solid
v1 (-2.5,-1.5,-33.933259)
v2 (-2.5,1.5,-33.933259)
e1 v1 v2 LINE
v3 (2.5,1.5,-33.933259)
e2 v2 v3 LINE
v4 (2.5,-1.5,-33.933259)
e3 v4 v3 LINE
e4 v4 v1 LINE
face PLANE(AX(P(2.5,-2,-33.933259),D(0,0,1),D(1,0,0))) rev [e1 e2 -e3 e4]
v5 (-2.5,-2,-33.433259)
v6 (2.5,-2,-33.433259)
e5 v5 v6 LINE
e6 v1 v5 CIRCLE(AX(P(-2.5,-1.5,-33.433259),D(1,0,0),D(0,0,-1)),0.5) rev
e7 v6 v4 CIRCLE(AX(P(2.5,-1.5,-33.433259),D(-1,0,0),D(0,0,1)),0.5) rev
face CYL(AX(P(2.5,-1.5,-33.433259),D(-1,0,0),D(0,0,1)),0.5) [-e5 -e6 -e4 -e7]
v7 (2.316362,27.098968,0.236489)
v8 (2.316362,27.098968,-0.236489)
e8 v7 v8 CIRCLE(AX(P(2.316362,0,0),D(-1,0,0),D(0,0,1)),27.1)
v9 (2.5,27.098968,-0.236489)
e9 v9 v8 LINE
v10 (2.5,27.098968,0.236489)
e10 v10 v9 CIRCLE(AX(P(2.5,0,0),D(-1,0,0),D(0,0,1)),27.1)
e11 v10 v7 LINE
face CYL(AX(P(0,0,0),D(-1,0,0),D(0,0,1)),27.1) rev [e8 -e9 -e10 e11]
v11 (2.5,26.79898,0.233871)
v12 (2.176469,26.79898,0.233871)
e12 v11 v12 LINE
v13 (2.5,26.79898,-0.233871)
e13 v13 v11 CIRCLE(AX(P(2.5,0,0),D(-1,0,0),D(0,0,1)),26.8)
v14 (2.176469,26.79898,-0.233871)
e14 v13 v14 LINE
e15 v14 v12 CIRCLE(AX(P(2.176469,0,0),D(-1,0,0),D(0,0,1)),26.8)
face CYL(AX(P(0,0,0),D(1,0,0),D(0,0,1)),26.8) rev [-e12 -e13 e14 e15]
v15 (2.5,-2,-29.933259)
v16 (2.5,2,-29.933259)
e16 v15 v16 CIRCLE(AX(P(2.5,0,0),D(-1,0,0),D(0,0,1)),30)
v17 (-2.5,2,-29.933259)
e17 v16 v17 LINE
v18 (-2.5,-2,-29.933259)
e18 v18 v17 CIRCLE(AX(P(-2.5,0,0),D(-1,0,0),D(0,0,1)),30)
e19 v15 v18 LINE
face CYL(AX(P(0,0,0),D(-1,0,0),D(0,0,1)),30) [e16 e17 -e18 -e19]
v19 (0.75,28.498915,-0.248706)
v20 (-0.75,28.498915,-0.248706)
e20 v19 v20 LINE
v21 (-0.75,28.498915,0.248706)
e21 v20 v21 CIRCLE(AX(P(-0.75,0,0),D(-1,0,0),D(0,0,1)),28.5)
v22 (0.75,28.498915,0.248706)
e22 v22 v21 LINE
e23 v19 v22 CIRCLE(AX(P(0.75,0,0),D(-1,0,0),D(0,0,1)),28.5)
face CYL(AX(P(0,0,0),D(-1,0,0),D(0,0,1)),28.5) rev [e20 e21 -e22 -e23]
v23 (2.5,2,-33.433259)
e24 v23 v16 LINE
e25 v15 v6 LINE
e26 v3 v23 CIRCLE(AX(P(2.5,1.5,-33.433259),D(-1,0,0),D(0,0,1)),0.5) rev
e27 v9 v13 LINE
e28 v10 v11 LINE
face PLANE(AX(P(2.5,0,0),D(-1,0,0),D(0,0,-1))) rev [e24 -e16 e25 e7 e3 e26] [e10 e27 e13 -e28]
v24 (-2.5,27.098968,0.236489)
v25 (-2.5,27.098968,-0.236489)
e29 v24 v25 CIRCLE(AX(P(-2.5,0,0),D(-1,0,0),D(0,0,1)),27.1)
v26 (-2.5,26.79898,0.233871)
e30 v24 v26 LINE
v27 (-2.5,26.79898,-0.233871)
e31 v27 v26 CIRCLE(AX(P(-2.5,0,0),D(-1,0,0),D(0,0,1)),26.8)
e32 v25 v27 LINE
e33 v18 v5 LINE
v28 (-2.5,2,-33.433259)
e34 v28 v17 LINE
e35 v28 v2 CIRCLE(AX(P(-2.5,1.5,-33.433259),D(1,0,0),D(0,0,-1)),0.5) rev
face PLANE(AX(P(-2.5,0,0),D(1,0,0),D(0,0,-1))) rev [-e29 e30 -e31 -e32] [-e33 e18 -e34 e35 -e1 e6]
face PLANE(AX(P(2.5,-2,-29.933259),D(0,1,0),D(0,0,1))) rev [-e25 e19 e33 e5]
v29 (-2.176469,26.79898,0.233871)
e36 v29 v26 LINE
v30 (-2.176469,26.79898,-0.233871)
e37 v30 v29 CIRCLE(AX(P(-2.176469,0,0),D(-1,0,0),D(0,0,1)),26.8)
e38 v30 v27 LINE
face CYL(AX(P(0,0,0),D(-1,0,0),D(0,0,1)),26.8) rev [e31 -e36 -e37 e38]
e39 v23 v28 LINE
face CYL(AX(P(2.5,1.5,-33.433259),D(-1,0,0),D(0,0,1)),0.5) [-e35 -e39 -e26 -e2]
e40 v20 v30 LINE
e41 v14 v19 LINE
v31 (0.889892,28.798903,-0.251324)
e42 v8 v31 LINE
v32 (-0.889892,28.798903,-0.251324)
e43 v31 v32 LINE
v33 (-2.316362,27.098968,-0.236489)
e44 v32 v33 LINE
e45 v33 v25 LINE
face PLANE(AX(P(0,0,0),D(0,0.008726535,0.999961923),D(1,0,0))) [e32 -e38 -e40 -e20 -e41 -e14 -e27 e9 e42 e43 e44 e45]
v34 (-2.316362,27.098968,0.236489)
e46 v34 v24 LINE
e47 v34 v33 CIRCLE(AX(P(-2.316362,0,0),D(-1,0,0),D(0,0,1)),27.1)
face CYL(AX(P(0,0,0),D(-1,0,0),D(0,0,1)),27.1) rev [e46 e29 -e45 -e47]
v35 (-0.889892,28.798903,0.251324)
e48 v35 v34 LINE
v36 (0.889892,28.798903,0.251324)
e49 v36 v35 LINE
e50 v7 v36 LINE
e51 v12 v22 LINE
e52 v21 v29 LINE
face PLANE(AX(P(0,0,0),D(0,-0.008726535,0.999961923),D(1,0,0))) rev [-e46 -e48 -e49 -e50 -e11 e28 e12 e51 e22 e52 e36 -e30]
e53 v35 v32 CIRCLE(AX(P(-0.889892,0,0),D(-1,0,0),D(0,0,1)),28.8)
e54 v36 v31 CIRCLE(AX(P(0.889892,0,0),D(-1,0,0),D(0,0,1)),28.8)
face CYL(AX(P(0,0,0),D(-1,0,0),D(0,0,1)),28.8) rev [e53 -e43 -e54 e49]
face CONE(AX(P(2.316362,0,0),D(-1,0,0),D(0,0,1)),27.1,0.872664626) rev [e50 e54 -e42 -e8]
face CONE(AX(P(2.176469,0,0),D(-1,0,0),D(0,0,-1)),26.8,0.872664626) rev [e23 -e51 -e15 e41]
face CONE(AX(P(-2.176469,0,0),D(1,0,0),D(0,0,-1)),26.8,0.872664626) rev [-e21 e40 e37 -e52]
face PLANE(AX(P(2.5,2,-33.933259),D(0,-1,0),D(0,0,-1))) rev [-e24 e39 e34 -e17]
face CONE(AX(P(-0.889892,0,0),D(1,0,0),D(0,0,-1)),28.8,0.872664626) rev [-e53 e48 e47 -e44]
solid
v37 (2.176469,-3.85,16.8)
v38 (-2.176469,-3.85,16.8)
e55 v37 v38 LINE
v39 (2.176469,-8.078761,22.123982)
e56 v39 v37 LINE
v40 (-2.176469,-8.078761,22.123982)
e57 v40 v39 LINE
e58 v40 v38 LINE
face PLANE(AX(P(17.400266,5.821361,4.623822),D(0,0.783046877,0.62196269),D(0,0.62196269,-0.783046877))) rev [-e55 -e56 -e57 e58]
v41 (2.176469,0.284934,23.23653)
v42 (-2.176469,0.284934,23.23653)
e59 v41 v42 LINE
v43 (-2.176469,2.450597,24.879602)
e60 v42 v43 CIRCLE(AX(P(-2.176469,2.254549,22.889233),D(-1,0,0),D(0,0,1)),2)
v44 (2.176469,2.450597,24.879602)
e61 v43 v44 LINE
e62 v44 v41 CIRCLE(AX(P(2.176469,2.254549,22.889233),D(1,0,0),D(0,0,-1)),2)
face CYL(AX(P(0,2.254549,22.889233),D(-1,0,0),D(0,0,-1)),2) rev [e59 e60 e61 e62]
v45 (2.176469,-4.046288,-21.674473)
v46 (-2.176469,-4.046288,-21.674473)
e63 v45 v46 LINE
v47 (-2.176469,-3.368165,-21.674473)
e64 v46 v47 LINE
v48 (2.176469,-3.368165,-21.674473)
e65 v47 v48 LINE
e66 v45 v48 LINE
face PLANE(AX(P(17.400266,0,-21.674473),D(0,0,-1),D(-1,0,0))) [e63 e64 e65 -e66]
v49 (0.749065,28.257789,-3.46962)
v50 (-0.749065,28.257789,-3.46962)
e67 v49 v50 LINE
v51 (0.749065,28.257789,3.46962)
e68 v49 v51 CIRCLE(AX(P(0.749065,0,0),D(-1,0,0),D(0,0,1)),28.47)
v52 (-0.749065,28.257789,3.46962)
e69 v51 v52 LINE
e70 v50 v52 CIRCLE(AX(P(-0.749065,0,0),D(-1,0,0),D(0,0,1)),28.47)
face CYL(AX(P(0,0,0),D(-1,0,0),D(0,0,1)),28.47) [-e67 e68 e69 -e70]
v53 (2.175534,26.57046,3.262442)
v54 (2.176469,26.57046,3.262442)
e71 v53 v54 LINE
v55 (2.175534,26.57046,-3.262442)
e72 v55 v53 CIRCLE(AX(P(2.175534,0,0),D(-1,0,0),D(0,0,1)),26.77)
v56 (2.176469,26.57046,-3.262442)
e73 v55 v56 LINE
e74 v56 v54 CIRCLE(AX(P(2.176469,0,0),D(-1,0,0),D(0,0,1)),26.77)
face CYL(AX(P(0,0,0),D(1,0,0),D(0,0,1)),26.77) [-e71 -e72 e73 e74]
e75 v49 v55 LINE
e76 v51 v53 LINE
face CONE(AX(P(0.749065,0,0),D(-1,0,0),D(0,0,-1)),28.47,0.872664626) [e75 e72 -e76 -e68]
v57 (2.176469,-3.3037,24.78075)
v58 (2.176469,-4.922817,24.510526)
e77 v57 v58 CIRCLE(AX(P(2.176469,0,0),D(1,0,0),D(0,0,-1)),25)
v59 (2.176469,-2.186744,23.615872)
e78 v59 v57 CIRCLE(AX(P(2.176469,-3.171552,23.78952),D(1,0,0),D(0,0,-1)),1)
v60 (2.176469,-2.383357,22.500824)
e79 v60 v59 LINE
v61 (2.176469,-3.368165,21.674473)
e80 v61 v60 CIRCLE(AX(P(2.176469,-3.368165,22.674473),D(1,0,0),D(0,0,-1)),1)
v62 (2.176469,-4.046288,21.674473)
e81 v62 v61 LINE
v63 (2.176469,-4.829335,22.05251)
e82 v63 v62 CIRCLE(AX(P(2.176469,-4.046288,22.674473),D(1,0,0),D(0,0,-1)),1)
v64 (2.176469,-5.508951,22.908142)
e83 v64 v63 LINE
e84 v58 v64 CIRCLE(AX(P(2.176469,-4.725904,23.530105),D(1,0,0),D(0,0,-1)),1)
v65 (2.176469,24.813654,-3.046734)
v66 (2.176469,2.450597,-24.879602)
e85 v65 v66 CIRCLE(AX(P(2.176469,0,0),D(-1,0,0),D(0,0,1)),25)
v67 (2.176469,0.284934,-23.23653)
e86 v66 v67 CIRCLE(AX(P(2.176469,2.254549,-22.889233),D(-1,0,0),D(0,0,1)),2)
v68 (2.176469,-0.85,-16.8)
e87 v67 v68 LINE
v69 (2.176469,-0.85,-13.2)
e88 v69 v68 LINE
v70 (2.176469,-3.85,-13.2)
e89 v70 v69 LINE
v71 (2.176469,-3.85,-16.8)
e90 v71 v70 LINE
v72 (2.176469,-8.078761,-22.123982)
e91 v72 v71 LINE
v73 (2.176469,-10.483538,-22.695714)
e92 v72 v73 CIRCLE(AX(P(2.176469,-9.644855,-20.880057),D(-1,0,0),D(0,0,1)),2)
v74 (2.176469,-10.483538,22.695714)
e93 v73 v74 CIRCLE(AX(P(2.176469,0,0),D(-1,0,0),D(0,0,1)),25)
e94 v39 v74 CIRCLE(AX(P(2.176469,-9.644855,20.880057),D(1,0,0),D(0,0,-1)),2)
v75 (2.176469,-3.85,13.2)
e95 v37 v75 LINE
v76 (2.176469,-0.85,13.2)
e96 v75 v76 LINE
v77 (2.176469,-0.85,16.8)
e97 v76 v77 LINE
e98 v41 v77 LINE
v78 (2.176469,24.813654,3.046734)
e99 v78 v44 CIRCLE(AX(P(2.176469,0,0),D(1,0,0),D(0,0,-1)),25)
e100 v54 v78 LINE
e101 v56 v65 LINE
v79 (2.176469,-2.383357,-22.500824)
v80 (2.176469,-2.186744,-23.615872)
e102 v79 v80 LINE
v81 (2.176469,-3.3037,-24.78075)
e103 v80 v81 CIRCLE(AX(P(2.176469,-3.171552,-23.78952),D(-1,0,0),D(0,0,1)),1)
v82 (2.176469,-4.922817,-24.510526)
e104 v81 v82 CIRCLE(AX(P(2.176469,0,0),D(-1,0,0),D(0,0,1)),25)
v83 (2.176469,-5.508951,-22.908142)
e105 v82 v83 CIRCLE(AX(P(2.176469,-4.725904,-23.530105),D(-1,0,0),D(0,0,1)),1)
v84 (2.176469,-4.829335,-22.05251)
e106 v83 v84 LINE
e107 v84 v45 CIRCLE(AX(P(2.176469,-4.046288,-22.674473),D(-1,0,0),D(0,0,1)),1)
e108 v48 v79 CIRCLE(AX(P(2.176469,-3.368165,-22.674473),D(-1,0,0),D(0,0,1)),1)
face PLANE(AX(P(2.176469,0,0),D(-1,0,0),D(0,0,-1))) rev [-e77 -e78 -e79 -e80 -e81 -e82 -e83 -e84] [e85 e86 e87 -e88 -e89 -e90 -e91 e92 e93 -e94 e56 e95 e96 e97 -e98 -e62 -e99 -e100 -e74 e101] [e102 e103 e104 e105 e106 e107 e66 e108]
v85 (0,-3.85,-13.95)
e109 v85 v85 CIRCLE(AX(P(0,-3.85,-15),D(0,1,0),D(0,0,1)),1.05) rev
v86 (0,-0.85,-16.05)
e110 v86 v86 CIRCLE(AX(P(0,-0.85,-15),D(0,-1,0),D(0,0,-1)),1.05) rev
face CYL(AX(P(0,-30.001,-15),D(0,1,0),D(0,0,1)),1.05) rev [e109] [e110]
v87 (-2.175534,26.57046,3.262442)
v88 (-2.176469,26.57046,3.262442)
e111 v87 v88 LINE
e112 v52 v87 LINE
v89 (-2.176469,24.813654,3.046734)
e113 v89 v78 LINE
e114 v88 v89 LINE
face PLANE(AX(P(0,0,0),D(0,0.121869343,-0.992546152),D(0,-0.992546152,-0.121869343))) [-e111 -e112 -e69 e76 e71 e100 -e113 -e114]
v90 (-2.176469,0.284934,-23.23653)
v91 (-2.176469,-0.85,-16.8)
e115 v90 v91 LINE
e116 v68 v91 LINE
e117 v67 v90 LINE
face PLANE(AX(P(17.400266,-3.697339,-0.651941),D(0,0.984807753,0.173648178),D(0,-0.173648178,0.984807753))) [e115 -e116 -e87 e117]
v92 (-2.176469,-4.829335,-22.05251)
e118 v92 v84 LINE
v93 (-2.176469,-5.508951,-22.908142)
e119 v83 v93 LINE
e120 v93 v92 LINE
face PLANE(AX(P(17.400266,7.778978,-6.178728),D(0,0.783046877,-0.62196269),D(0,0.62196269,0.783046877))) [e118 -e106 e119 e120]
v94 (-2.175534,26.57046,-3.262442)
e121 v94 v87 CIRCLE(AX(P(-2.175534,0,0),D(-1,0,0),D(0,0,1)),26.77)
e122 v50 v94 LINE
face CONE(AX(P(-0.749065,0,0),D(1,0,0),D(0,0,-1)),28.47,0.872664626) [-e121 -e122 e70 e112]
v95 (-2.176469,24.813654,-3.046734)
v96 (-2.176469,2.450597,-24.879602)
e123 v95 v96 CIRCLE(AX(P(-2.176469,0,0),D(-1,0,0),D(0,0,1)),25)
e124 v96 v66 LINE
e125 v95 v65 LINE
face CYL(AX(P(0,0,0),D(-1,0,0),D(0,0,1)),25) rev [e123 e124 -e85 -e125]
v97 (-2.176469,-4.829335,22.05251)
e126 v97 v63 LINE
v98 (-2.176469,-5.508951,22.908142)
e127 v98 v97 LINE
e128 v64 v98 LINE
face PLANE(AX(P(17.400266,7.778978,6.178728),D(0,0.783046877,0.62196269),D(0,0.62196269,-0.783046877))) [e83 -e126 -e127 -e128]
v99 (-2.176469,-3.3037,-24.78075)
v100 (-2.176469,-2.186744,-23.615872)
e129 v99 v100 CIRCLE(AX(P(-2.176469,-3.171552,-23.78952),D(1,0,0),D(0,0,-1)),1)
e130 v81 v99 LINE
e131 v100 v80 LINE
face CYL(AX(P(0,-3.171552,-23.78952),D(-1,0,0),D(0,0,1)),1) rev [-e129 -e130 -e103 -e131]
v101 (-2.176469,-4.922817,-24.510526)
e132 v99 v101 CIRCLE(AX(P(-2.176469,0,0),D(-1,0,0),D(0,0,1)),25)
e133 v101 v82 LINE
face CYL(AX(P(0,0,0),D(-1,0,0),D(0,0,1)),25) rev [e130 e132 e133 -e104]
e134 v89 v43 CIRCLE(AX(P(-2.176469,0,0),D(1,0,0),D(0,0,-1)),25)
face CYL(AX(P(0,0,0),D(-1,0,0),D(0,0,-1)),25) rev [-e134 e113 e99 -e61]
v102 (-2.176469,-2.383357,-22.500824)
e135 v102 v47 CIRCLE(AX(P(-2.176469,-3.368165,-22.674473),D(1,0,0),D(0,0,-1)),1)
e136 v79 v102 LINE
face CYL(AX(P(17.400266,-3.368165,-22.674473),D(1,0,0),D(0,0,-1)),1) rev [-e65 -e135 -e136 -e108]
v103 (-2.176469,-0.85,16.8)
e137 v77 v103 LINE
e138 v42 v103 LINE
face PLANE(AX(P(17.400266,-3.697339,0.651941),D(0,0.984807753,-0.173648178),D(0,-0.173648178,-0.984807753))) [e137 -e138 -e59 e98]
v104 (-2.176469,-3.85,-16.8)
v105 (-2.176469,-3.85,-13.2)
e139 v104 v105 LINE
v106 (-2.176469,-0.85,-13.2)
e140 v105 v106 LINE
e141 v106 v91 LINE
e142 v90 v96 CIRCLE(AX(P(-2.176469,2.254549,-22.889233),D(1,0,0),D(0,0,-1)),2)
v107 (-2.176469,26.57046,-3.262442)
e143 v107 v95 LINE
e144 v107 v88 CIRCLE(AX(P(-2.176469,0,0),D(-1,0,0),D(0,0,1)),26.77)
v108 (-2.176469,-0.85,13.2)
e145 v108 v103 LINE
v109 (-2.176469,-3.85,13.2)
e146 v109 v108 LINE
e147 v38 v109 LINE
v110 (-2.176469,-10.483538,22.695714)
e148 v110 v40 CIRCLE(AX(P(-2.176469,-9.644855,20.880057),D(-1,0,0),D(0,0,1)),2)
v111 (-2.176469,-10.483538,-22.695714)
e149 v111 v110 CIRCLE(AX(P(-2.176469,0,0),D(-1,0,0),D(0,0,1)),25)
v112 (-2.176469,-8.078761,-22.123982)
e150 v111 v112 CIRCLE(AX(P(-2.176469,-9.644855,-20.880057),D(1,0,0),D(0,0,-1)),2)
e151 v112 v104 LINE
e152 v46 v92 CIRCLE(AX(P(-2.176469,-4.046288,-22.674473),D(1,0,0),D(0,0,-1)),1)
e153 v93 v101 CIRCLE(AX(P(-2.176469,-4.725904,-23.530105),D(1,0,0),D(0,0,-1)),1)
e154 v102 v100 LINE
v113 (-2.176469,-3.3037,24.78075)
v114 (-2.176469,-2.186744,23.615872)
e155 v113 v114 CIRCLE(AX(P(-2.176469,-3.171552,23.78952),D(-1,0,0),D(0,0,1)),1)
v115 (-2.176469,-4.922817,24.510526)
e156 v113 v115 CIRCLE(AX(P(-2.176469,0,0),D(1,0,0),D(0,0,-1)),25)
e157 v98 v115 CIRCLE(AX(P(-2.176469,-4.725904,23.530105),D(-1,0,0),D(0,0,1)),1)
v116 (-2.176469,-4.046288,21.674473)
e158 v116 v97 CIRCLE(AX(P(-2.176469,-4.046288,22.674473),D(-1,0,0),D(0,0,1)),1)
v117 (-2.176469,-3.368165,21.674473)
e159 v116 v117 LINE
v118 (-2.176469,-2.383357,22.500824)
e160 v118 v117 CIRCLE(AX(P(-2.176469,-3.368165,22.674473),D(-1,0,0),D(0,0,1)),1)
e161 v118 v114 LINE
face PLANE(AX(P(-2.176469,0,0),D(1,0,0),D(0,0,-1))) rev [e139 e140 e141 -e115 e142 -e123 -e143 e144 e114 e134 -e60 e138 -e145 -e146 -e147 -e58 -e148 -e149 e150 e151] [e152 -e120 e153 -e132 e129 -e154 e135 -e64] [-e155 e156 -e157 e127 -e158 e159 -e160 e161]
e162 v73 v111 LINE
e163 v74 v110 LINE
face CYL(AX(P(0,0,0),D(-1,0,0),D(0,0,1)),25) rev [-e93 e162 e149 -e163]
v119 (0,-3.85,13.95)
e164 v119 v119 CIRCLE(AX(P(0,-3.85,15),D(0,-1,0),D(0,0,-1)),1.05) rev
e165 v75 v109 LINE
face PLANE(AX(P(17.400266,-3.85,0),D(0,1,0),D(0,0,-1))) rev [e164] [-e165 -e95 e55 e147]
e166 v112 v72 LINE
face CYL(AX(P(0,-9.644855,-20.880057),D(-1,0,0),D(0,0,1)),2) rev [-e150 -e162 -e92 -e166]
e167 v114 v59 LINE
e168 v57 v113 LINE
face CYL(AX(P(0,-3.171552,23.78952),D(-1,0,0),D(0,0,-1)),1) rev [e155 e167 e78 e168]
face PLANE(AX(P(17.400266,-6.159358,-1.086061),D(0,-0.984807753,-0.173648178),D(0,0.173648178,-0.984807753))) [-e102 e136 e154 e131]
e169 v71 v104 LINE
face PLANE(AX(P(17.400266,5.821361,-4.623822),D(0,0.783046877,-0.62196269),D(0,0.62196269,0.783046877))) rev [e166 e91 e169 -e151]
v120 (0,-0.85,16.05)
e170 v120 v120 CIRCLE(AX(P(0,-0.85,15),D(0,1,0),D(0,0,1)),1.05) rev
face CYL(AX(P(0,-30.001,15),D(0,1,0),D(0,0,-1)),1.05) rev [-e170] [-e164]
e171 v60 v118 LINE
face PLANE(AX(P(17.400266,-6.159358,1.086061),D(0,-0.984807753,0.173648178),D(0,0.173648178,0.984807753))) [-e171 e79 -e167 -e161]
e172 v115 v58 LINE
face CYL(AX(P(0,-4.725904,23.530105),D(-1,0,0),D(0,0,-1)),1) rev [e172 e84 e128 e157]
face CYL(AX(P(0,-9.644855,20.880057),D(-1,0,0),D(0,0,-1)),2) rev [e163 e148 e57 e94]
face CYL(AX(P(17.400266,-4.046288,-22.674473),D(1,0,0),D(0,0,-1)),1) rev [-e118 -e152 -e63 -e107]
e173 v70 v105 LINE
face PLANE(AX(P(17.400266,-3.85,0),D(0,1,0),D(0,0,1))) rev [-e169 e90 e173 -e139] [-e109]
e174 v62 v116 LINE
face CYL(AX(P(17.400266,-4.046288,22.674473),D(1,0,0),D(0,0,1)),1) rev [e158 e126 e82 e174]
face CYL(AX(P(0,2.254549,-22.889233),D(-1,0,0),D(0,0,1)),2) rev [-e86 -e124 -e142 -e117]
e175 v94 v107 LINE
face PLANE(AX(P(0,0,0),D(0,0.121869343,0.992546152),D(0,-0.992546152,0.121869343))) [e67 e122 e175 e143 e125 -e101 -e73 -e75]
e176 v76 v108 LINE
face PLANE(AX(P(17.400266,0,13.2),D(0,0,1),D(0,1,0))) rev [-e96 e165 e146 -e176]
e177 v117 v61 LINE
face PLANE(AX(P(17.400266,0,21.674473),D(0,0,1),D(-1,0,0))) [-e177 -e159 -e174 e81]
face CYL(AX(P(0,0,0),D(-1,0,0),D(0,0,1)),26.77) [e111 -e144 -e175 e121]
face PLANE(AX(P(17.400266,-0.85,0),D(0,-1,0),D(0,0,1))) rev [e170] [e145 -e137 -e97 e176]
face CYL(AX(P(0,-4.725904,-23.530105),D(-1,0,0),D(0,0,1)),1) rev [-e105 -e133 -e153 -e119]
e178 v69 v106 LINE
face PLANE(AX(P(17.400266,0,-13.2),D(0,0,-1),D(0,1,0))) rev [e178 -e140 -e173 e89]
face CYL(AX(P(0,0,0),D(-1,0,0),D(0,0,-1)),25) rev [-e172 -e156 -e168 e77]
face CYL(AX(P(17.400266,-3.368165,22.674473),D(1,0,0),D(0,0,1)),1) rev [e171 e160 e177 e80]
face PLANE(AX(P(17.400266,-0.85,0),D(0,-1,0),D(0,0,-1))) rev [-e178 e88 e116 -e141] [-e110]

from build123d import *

# Parameters (mm, degrees)
REVOLVE2_ANGLE      = 173
BOSS_EXTRUDE1_START = -2.176469
BOSS_EXTRUDE1_DEPTH = 4.352938
FILLET1_R           = 2
FILLET2_R           = 1
CUT_EXTRUDE1_REACH  = 44.5
SKETCH4_R           = 1.05
SKETCH5_W           = 4
SKETCH5_H           = 4
BOSS_EXTRUDE2_DEPTH = 2.5
FILLET3_R           = 0.5
CUT_REVOLVE2_ANGLE  = 1


# Read off the part's stored shape, not the designer's step: Revolve2
with BuildPart() as part:
    # Sketch2 → Revolve1 (revolve)
    with BuildSketch(Plane(origin=(0, 0, 0), x_dir=(1, 0, 0), z_dir=(0, 1, 0)), mode=Mode.PRIVATE) as revolve1_sk:
        Polygon((-0.75, 28.5), (0, 28.5), (0, 30), (-2.5, 30), (-2.5, 26.8), (-2.176469373, 26.8), align=None)
    revolve1 = revolve(revolve1_sk.sketch.rotate(Axis((0, 0, 0), (1, 0, 0)), 180), axis=Axis((0, 0, 0), (1, 0, 0)))


with BuildPart() as body_2:
    # Revolve2 outline → Revolve2 (revolve)
    with BuildSketch(Plane(origin=(0, 0, 0), x_dir=(0, -1, 0), z_dir=(0, 0, 1))):
        Polygon((25, 0), (25, -2.176469373), (26.77, -2.176469373), (26.77, -2.175534216), (28.47, -0.749064843), (28.47, 0), align=None)
    revolve2 = revolve(axis=Axis((0, 0, 0), (1, 0, 0)), revolution_arc=REVOLVE2_ANGLE)


with BuildPart() as part_1:
    add(part.part)

    add(body_2.part)  # Mirror1 merges body 2
    # Mirror1: Revolve1, Revolve2 across plane
    add(revolve1.mirror(Plane(origin=(0, 0, 0), x_dir=(0, 0, 1), z_dir=(1, 0, 0))))
    add(revolve2.mirror(Plane(origin=(0, 0, 0), x_dir=(0, 0, 1), z_dir=(1, 0, 0))))

    # Sketch3 → Boss-Extrude1 (add)
    with BuildSketch(Plane(origin=(0, 0, 0), x_dir=(0, 0, -1), z_dir=(1, 0, 0)).offset(BOSS_EXTRUDE1_START)):
        with BuildLine():
            Line((24.992927205, 0.594634117), (16.8, -0.85))
            Line((16.8, -0.85), (13.2, -0.85))
            Line((13.2, -0.85), (13.2, -3.85))
            Line((13.2, -3.85), (16.8, -3.85))
            Line((16.8, -3.85), (23.314414659, -9.024304356))
            ThreePointArc((23.314414659, -9.024304356), (23.762509208, -7.768085746), (24.142970944, -6.489757623))
            Line((24.142970944, -6.489757623), (21.674472629, -4.529065489))
            Line((21.674472629, -4.529065489), (21.674472629, -2.529065489))
            Line((21.674472629, -2.529065489), (24.923348035, -1.956201097))
            ThreePointArc((24.923348035, -1.956201097), (24.990704742, -0.681671824), (24.992927205, 0.594634117))
        make_face()
    extrude(amount=BOSS_EXTRUDE1_DEPTH)

    # Fillet1
    # the kernel refuses this fillet: 2 mm, written as the material it adds along each edge
    with BuildSketch(Plane(origin=(-6.825018134, 0.594634117, -24.992927205), x_dir=(0, 0.9981410168670989, 0.06094678373395691), z_dir=(1, 0, 0))) as fillet1_piece_1_section:
        with BuildLine():
            CenterArc((1.785042868, 1.998616545), FILLET1_R, 186.505841055, 85.625388348)
            Line((-0.202077752, 1.772007538), (0, 0))
            ThreePointArc((0, 0), (0.929709827, -0.017293188), (1.859419654, 0))
        make_face()
    fillet1_piece_1 = extrude(amount=13.650036268, mode=Mode.PRIVATE)
    fillet1_piece_1 = split(fillet1_piece_1, bisect_by=Plane(origin=(-2.176469373, 0.943690029, -24.587007533), z_dir=(1, 0, 0)), keep=Keep.TOP, mode=Mode.PRIVATE)
    fillet1_piece_1 = split(fillet1_piece_1, bisect_by=Plane(origin=(2.176469373, 0.943690029, -24.587007533), z_dir=(-1, 0, 0)), keep=Keep.TOP, mode=Mode.PRIVATE)
    add(fillet1_piece_1)
    with BuildSketch(Plane(origin=(-6.138912646, -9.024304356, -23.314414659), x_dir=(0, -0.9206652582937424, 0.39035302249491644), z_dir=(1, 0, 0))) as fillet1_piece_2_section:
        with BuildLine():
            CenterArc((1.52157836, -1.998994886), FILLET1_R, 88.183445303, 76.333419365)
            Line((-0.405839783, -1.465085435), (0, 0))
            ThreePointArc((0, 0), (0.792488729, 0.012563925), (1.584977458, 0))
        make_face()
    fillet1_piece_2 = extrude(amount=12.277825292, mode=Mode.PRIVATE)
    fillet1_piece_2 = split(fillet1_piece_2, bisect_by=Plane(origin=(-2.176469373, -9.144329866, -22.922792538), z_dir=(1, 0, 0)), keep=Keep.TOP, mode=Mode.PRIVATE)
    fillet1_piece_2 = split(fillet1_piece_2, bisect_by=Plane(origin=(2.176469373, -9.144329866, -22.922792538), z_dir=(-1, 0, 0)), keep=Keep.TOP, mode=Mode.PRIVATE)
    add(fillet1_piece_2)

    # Fillet2
    fillet2_edges = [part_1.edges().sort_by_distance(p)[0] for p in [
        (0, -1.956201097, -24.923348035),
        (0, -2.529065489, -21.674472629),
        (0, -4.529065489, -21.674472629),
        (0, -6.489757623, -24.142970944),
    ]]
    fillet(fillet2_edges, radius=FILLET2_R)

    # Sketch4 → Cut-Extrude1 (cut, up to next)
    with BuildSketch(Plane(origin=(0, 0, 0), x_dir=(1, 0, 0), z_dir=(0, 1, 0)), mode=Mode.PRIVATE) as cut_extrude1_sk1:
        with Locations(Location((0, 15, 0), (0, 0, 270))):
            Circle(SKETCH4_R)
    cut_extrude1_tool1 = extrude(cut_extrude1_sk1.sketch, amount=-CUT_EXTRUDE1_REACH, mode=Mode.PRIVATE) & part_1.part
    add(cut_extrude1_tool1.solids().sort_by_distance((0, 0, -15))[0], mode=Mode.SUBTRACT)

    # Mirror2: part across plane


with BuildPart() as part_2:
    add(part_1.part)
    add(part_1.part.mirror(Plane.XY))

    # Sketch5 → Boss-Extrude2 (add, symmetric)
    with BuildSketch(Plane(origin=(0, 0, 0), x_dir=(0, 0, -1), z_dir=(1, 0, 0))):
        with Locations((31.933259094, 0)):
            Rectangle(SKETCH5_W, SKETCH5_H)
    extrude(amount=BOSS_EXTRUDE2_DEPTH, both=True)

    # Fillet3
    fillet3_edges = [part_2.edges().sort_by_distance(p)[0] for p in [
        (0, 2, -33.933259094),
        (0, -2, -33.933259094),
    ]]
    fillet(fillet3_edges, radius=FILLET3_R)

    # Sketch6 → Cut-Revolve2 (revolve, symmetric, cut)
    with BuildSketch(Plane.XY) as cut_revolve2_sk:
        Polygon((2.5, 27.1), (2.31636167, 27.1), (0.889892297, 28.8), (-0.889892297, 28.8), (-2.31636167, 27.1), (-2.5, 27.1), (-2.5, 26.8), (-2.176469373, 26.8), (-0.75, 28.5), (0.75, 28.5), (2.176469373, 26.8), (2.5, 26.8), align=None)
    revolve(axis=Axis((0, 0, 0), (1, 0, 0)), revolution_arc=CUT_REVOLVE2_ANGLE / 2, mode=Mode.SUBTRACT)
    revolve(cut_revolve2_sk.sketch, axis=Axis((0, 0, 0), (-1, 0, 0)), revolution_arc=CUT_REVOLVE2_ANGLE / 2, mode=Mode.SUBTRACT)


solid = part_2.part
